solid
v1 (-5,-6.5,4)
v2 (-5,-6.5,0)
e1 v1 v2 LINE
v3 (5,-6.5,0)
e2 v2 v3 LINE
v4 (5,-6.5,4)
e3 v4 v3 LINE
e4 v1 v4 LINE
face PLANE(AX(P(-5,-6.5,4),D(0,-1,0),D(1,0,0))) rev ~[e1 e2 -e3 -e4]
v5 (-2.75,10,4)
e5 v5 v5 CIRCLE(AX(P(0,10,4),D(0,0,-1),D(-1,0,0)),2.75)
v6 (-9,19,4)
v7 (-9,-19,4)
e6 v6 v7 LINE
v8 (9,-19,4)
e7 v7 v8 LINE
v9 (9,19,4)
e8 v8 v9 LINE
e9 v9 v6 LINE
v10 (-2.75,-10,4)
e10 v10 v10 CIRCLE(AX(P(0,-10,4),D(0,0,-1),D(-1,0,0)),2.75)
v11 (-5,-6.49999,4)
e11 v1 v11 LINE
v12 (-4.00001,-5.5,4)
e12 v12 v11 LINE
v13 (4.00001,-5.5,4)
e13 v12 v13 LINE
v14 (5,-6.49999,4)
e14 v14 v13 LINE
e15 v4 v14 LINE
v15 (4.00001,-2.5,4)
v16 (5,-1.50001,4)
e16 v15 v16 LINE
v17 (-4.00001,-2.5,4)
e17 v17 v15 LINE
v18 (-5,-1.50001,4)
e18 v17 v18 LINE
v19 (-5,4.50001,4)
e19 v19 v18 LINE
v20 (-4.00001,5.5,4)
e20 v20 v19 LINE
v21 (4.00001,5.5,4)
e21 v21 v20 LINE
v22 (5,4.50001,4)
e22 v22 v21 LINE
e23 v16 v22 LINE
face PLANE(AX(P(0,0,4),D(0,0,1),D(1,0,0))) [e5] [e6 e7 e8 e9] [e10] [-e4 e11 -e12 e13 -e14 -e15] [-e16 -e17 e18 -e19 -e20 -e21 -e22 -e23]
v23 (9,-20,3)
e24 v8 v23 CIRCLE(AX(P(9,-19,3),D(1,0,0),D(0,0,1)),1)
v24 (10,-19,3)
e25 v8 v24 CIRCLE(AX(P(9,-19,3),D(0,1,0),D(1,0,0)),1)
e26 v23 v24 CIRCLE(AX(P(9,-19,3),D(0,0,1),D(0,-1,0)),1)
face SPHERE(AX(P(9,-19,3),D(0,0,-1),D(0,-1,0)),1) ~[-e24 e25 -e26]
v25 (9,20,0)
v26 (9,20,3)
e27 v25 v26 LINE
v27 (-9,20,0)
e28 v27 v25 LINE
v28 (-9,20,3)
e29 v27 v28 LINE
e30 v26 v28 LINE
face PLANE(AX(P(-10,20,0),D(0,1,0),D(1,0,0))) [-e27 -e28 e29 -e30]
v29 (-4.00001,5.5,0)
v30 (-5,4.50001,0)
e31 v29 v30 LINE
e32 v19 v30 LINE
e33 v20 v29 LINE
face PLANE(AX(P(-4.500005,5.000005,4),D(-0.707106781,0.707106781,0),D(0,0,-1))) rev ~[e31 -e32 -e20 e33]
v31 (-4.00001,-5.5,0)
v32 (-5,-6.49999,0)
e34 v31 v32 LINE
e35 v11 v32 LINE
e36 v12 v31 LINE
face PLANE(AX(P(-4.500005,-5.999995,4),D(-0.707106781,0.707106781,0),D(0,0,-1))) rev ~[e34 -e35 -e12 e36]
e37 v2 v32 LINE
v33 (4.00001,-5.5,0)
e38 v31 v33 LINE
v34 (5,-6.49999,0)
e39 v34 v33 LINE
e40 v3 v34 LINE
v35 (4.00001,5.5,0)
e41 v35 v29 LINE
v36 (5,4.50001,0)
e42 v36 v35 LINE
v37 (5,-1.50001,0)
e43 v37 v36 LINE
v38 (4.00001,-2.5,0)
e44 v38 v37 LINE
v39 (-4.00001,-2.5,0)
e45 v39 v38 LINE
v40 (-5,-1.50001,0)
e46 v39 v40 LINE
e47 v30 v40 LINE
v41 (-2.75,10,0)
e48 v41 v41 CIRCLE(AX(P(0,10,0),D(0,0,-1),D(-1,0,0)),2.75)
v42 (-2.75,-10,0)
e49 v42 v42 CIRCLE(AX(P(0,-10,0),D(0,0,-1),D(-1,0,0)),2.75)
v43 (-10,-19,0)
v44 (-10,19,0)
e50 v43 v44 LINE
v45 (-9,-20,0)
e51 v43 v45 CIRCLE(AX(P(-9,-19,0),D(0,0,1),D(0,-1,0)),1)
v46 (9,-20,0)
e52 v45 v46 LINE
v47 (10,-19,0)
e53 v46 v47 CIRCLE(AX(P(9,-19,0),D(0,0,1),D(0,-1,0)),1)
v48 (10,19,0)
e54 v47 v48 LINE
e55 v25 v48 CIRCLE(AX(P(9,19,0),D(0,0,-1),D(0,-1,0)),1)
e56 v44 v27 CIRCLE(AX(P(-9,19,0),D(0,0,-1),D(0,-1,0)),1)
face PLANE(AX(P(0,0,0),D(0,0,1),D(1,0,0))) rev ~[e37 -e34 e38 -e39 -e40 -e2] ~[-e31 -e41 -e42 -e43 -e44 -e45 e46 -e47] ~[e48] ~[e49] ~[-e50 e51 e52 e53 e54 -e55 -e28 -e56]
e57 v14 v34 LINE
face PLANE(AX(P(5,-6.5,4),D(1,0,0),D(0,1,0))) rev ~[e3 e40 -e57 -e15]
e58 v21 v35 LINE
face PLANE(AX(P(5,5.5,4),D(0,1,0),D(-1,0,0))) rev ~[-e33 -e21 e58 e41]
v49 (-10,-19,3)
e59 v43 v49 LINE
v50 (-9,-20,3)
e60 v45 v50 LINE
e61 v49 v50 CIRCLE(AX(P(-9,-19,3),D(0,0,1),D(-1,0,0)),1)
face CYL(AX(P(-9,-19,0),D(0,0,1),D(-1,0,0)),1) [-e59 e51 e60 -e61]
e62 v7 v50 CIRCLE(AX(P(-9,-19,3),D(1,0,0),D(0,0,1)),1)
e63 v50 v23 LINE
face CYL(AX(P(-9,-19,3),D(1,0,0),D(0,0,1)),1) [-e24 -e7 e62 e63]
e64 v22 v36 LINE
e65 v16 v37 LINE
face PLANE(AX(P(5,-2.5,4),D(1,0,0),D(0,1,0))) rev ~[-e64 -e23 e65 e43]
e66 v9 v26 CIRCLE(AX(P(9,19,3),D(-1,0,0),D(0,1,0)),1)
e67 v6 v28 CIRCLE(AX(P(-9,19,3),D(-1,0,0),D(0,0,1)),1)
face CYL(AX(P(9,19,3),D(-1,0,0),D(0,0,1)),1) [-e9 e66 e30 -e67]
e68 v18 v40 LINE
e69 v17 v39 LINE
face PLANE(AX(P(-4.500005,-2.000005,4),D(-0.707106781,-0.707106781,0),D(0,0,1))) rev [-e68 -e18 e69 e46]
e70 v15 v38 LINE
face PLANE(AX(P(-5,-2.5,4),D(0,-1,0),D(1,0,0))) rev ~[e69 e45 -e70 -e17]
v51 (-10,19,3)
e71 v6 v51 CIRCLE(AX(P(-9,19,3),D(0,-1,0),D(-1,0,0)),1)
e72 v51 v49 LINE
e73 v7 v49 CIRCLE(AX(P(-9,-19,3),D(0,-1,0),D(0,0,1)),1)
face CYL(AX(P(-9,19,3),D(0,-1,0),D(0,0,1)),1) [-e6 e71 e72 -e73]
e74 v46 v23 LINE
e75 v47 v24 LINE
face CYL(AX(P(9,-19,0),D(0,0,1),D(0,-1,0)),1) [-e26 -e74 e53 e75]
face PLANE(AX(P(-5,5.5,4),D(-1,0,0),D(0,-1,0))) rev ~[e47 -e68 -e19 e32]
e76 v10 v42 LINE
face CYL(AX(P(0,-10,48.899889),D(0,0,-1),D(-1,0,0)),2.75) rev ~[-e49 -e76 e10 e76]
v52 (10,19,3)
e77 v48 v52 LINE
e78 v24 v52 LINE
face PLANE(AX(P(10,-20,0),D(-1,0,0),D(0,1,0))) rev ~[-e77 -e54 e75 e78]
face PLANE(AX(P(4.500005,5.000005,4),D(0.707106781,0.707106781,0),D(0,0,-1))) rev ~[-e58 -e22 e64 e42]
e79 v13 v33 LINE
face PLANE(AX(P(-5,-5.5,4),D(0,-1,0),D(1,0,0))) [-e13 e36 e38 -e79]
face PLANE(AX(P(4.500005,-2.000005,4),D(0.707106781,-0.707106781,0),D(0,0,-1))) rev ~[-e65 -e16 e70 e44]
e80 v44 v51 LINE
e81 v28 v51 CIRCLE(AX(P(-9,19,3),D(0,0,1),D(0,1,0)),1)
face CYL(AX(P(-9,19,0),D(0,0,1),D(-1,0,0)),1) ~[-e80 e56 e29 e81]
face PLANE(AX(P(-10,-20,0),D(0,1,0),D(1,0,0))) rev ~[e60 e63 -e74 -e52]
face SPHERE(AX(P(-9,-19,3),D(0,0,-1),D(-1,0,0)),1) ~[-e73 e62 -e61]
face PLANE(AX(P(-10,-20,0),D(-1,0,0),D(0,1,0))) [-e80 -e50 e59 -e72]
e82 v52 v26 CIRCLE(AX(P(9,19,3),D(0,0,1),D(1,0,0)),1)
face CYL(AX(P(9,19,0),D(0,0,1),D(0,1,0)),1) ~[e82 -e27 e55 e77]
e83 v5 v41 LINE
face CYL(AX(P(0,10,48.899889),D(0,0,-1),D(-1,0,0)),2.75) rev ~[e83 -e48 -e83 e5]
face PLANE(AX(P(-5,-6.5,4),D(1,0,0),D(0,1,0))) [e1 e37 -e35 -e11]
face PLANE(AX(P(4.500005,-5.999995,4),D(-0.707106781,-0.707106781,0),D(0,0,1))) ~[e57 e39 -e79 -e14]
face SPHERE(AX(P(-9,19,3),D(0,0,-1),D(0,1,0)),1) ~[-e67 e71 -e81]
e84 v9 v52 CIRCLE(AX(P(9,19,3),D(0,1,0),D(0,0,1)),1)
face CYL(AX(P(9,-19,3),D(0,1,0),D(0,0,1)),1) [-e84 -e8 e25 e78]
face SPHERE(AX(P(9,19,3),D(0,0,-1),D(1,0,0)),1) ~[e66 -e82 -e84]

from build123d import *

# Parameters (mm, degrees)
F5_W     = 20
F5_H     = 40
F6_DEPTH = 4
F1_D     = 5.5
F2_R     = 1
F7_W     = 10
F7_H     = 1
F8_DEPTH = 25
F3_R     = 1
F4_SIZE  = 0.99999


# Not quite as in the source:
# - a fillet or chamfer is up to 0.001 mm smaller than in the source, because OpenCascade refuses the exact size
# - a feature names something its author has since deleted; it is built from what else it names


with BuildPart() as f6:
    # F5 (on Top) → F6 (new body)
    with BuildSketch(Plane.XY):
        Rectangle(F5_W, F5_H)
    extrude(amount=F6_DEPTH)

    # F1 (through all)
    with Locations(Plane.XY.offset(4)):
        with Locations((0, 10), (0, -10)):
            Hole(F1_D / 2)

    # F2
    f2_edges = [f6.edges().sort_by_distance(p)[0] for p in [
        (-10, -20, 2),
        (10, -20, 2),
        (-10, 20, 2),
        (10, 20, 2),
    ]]
    fillet(f2_edges, radius=F2_R)

    # F7 (on face) → F8 (cut)
    with BuildSketch(Plane.XY.offset(4)):
        Polygon((-5, -2.5), (5, -2.5), (5, 2.5), (5, 5.5), (-5, 5.5), (-5, 2.5), align=None)
        with Locations((0, -6)):
            Rectangle(F7_W, F7_H)
    extrude(amount=-F8_DEPTH, mode=Mode.SUBTRACT)

    # F3
    f3_edges = [f6.edges().sort_by_distance(p)[0] for p in [
        (0, -20, 4),
        (10, 0, 4),
        (0, 20, 4),
        (-10, 0, 4),
    ]]
    fillet(f3_edges, radius=F3_R)

    # F4 (size 1 in the source; OpenCascade refuses exactly that, so slightly less here)
    f4_edges = [f6.edges().sort_by_distance(p)[0] for p in [
        (-5, -5.5, 2),
        (5, -5.5, 2),
        (5, 5.5, 2),
        (-5, 5.5, 2),
        (-5, -2.5, 2),
        (5, -2.5, 2),
    ]]
    chamfer(f4_edges, length=F4_SIZE)


solid = f6.part
